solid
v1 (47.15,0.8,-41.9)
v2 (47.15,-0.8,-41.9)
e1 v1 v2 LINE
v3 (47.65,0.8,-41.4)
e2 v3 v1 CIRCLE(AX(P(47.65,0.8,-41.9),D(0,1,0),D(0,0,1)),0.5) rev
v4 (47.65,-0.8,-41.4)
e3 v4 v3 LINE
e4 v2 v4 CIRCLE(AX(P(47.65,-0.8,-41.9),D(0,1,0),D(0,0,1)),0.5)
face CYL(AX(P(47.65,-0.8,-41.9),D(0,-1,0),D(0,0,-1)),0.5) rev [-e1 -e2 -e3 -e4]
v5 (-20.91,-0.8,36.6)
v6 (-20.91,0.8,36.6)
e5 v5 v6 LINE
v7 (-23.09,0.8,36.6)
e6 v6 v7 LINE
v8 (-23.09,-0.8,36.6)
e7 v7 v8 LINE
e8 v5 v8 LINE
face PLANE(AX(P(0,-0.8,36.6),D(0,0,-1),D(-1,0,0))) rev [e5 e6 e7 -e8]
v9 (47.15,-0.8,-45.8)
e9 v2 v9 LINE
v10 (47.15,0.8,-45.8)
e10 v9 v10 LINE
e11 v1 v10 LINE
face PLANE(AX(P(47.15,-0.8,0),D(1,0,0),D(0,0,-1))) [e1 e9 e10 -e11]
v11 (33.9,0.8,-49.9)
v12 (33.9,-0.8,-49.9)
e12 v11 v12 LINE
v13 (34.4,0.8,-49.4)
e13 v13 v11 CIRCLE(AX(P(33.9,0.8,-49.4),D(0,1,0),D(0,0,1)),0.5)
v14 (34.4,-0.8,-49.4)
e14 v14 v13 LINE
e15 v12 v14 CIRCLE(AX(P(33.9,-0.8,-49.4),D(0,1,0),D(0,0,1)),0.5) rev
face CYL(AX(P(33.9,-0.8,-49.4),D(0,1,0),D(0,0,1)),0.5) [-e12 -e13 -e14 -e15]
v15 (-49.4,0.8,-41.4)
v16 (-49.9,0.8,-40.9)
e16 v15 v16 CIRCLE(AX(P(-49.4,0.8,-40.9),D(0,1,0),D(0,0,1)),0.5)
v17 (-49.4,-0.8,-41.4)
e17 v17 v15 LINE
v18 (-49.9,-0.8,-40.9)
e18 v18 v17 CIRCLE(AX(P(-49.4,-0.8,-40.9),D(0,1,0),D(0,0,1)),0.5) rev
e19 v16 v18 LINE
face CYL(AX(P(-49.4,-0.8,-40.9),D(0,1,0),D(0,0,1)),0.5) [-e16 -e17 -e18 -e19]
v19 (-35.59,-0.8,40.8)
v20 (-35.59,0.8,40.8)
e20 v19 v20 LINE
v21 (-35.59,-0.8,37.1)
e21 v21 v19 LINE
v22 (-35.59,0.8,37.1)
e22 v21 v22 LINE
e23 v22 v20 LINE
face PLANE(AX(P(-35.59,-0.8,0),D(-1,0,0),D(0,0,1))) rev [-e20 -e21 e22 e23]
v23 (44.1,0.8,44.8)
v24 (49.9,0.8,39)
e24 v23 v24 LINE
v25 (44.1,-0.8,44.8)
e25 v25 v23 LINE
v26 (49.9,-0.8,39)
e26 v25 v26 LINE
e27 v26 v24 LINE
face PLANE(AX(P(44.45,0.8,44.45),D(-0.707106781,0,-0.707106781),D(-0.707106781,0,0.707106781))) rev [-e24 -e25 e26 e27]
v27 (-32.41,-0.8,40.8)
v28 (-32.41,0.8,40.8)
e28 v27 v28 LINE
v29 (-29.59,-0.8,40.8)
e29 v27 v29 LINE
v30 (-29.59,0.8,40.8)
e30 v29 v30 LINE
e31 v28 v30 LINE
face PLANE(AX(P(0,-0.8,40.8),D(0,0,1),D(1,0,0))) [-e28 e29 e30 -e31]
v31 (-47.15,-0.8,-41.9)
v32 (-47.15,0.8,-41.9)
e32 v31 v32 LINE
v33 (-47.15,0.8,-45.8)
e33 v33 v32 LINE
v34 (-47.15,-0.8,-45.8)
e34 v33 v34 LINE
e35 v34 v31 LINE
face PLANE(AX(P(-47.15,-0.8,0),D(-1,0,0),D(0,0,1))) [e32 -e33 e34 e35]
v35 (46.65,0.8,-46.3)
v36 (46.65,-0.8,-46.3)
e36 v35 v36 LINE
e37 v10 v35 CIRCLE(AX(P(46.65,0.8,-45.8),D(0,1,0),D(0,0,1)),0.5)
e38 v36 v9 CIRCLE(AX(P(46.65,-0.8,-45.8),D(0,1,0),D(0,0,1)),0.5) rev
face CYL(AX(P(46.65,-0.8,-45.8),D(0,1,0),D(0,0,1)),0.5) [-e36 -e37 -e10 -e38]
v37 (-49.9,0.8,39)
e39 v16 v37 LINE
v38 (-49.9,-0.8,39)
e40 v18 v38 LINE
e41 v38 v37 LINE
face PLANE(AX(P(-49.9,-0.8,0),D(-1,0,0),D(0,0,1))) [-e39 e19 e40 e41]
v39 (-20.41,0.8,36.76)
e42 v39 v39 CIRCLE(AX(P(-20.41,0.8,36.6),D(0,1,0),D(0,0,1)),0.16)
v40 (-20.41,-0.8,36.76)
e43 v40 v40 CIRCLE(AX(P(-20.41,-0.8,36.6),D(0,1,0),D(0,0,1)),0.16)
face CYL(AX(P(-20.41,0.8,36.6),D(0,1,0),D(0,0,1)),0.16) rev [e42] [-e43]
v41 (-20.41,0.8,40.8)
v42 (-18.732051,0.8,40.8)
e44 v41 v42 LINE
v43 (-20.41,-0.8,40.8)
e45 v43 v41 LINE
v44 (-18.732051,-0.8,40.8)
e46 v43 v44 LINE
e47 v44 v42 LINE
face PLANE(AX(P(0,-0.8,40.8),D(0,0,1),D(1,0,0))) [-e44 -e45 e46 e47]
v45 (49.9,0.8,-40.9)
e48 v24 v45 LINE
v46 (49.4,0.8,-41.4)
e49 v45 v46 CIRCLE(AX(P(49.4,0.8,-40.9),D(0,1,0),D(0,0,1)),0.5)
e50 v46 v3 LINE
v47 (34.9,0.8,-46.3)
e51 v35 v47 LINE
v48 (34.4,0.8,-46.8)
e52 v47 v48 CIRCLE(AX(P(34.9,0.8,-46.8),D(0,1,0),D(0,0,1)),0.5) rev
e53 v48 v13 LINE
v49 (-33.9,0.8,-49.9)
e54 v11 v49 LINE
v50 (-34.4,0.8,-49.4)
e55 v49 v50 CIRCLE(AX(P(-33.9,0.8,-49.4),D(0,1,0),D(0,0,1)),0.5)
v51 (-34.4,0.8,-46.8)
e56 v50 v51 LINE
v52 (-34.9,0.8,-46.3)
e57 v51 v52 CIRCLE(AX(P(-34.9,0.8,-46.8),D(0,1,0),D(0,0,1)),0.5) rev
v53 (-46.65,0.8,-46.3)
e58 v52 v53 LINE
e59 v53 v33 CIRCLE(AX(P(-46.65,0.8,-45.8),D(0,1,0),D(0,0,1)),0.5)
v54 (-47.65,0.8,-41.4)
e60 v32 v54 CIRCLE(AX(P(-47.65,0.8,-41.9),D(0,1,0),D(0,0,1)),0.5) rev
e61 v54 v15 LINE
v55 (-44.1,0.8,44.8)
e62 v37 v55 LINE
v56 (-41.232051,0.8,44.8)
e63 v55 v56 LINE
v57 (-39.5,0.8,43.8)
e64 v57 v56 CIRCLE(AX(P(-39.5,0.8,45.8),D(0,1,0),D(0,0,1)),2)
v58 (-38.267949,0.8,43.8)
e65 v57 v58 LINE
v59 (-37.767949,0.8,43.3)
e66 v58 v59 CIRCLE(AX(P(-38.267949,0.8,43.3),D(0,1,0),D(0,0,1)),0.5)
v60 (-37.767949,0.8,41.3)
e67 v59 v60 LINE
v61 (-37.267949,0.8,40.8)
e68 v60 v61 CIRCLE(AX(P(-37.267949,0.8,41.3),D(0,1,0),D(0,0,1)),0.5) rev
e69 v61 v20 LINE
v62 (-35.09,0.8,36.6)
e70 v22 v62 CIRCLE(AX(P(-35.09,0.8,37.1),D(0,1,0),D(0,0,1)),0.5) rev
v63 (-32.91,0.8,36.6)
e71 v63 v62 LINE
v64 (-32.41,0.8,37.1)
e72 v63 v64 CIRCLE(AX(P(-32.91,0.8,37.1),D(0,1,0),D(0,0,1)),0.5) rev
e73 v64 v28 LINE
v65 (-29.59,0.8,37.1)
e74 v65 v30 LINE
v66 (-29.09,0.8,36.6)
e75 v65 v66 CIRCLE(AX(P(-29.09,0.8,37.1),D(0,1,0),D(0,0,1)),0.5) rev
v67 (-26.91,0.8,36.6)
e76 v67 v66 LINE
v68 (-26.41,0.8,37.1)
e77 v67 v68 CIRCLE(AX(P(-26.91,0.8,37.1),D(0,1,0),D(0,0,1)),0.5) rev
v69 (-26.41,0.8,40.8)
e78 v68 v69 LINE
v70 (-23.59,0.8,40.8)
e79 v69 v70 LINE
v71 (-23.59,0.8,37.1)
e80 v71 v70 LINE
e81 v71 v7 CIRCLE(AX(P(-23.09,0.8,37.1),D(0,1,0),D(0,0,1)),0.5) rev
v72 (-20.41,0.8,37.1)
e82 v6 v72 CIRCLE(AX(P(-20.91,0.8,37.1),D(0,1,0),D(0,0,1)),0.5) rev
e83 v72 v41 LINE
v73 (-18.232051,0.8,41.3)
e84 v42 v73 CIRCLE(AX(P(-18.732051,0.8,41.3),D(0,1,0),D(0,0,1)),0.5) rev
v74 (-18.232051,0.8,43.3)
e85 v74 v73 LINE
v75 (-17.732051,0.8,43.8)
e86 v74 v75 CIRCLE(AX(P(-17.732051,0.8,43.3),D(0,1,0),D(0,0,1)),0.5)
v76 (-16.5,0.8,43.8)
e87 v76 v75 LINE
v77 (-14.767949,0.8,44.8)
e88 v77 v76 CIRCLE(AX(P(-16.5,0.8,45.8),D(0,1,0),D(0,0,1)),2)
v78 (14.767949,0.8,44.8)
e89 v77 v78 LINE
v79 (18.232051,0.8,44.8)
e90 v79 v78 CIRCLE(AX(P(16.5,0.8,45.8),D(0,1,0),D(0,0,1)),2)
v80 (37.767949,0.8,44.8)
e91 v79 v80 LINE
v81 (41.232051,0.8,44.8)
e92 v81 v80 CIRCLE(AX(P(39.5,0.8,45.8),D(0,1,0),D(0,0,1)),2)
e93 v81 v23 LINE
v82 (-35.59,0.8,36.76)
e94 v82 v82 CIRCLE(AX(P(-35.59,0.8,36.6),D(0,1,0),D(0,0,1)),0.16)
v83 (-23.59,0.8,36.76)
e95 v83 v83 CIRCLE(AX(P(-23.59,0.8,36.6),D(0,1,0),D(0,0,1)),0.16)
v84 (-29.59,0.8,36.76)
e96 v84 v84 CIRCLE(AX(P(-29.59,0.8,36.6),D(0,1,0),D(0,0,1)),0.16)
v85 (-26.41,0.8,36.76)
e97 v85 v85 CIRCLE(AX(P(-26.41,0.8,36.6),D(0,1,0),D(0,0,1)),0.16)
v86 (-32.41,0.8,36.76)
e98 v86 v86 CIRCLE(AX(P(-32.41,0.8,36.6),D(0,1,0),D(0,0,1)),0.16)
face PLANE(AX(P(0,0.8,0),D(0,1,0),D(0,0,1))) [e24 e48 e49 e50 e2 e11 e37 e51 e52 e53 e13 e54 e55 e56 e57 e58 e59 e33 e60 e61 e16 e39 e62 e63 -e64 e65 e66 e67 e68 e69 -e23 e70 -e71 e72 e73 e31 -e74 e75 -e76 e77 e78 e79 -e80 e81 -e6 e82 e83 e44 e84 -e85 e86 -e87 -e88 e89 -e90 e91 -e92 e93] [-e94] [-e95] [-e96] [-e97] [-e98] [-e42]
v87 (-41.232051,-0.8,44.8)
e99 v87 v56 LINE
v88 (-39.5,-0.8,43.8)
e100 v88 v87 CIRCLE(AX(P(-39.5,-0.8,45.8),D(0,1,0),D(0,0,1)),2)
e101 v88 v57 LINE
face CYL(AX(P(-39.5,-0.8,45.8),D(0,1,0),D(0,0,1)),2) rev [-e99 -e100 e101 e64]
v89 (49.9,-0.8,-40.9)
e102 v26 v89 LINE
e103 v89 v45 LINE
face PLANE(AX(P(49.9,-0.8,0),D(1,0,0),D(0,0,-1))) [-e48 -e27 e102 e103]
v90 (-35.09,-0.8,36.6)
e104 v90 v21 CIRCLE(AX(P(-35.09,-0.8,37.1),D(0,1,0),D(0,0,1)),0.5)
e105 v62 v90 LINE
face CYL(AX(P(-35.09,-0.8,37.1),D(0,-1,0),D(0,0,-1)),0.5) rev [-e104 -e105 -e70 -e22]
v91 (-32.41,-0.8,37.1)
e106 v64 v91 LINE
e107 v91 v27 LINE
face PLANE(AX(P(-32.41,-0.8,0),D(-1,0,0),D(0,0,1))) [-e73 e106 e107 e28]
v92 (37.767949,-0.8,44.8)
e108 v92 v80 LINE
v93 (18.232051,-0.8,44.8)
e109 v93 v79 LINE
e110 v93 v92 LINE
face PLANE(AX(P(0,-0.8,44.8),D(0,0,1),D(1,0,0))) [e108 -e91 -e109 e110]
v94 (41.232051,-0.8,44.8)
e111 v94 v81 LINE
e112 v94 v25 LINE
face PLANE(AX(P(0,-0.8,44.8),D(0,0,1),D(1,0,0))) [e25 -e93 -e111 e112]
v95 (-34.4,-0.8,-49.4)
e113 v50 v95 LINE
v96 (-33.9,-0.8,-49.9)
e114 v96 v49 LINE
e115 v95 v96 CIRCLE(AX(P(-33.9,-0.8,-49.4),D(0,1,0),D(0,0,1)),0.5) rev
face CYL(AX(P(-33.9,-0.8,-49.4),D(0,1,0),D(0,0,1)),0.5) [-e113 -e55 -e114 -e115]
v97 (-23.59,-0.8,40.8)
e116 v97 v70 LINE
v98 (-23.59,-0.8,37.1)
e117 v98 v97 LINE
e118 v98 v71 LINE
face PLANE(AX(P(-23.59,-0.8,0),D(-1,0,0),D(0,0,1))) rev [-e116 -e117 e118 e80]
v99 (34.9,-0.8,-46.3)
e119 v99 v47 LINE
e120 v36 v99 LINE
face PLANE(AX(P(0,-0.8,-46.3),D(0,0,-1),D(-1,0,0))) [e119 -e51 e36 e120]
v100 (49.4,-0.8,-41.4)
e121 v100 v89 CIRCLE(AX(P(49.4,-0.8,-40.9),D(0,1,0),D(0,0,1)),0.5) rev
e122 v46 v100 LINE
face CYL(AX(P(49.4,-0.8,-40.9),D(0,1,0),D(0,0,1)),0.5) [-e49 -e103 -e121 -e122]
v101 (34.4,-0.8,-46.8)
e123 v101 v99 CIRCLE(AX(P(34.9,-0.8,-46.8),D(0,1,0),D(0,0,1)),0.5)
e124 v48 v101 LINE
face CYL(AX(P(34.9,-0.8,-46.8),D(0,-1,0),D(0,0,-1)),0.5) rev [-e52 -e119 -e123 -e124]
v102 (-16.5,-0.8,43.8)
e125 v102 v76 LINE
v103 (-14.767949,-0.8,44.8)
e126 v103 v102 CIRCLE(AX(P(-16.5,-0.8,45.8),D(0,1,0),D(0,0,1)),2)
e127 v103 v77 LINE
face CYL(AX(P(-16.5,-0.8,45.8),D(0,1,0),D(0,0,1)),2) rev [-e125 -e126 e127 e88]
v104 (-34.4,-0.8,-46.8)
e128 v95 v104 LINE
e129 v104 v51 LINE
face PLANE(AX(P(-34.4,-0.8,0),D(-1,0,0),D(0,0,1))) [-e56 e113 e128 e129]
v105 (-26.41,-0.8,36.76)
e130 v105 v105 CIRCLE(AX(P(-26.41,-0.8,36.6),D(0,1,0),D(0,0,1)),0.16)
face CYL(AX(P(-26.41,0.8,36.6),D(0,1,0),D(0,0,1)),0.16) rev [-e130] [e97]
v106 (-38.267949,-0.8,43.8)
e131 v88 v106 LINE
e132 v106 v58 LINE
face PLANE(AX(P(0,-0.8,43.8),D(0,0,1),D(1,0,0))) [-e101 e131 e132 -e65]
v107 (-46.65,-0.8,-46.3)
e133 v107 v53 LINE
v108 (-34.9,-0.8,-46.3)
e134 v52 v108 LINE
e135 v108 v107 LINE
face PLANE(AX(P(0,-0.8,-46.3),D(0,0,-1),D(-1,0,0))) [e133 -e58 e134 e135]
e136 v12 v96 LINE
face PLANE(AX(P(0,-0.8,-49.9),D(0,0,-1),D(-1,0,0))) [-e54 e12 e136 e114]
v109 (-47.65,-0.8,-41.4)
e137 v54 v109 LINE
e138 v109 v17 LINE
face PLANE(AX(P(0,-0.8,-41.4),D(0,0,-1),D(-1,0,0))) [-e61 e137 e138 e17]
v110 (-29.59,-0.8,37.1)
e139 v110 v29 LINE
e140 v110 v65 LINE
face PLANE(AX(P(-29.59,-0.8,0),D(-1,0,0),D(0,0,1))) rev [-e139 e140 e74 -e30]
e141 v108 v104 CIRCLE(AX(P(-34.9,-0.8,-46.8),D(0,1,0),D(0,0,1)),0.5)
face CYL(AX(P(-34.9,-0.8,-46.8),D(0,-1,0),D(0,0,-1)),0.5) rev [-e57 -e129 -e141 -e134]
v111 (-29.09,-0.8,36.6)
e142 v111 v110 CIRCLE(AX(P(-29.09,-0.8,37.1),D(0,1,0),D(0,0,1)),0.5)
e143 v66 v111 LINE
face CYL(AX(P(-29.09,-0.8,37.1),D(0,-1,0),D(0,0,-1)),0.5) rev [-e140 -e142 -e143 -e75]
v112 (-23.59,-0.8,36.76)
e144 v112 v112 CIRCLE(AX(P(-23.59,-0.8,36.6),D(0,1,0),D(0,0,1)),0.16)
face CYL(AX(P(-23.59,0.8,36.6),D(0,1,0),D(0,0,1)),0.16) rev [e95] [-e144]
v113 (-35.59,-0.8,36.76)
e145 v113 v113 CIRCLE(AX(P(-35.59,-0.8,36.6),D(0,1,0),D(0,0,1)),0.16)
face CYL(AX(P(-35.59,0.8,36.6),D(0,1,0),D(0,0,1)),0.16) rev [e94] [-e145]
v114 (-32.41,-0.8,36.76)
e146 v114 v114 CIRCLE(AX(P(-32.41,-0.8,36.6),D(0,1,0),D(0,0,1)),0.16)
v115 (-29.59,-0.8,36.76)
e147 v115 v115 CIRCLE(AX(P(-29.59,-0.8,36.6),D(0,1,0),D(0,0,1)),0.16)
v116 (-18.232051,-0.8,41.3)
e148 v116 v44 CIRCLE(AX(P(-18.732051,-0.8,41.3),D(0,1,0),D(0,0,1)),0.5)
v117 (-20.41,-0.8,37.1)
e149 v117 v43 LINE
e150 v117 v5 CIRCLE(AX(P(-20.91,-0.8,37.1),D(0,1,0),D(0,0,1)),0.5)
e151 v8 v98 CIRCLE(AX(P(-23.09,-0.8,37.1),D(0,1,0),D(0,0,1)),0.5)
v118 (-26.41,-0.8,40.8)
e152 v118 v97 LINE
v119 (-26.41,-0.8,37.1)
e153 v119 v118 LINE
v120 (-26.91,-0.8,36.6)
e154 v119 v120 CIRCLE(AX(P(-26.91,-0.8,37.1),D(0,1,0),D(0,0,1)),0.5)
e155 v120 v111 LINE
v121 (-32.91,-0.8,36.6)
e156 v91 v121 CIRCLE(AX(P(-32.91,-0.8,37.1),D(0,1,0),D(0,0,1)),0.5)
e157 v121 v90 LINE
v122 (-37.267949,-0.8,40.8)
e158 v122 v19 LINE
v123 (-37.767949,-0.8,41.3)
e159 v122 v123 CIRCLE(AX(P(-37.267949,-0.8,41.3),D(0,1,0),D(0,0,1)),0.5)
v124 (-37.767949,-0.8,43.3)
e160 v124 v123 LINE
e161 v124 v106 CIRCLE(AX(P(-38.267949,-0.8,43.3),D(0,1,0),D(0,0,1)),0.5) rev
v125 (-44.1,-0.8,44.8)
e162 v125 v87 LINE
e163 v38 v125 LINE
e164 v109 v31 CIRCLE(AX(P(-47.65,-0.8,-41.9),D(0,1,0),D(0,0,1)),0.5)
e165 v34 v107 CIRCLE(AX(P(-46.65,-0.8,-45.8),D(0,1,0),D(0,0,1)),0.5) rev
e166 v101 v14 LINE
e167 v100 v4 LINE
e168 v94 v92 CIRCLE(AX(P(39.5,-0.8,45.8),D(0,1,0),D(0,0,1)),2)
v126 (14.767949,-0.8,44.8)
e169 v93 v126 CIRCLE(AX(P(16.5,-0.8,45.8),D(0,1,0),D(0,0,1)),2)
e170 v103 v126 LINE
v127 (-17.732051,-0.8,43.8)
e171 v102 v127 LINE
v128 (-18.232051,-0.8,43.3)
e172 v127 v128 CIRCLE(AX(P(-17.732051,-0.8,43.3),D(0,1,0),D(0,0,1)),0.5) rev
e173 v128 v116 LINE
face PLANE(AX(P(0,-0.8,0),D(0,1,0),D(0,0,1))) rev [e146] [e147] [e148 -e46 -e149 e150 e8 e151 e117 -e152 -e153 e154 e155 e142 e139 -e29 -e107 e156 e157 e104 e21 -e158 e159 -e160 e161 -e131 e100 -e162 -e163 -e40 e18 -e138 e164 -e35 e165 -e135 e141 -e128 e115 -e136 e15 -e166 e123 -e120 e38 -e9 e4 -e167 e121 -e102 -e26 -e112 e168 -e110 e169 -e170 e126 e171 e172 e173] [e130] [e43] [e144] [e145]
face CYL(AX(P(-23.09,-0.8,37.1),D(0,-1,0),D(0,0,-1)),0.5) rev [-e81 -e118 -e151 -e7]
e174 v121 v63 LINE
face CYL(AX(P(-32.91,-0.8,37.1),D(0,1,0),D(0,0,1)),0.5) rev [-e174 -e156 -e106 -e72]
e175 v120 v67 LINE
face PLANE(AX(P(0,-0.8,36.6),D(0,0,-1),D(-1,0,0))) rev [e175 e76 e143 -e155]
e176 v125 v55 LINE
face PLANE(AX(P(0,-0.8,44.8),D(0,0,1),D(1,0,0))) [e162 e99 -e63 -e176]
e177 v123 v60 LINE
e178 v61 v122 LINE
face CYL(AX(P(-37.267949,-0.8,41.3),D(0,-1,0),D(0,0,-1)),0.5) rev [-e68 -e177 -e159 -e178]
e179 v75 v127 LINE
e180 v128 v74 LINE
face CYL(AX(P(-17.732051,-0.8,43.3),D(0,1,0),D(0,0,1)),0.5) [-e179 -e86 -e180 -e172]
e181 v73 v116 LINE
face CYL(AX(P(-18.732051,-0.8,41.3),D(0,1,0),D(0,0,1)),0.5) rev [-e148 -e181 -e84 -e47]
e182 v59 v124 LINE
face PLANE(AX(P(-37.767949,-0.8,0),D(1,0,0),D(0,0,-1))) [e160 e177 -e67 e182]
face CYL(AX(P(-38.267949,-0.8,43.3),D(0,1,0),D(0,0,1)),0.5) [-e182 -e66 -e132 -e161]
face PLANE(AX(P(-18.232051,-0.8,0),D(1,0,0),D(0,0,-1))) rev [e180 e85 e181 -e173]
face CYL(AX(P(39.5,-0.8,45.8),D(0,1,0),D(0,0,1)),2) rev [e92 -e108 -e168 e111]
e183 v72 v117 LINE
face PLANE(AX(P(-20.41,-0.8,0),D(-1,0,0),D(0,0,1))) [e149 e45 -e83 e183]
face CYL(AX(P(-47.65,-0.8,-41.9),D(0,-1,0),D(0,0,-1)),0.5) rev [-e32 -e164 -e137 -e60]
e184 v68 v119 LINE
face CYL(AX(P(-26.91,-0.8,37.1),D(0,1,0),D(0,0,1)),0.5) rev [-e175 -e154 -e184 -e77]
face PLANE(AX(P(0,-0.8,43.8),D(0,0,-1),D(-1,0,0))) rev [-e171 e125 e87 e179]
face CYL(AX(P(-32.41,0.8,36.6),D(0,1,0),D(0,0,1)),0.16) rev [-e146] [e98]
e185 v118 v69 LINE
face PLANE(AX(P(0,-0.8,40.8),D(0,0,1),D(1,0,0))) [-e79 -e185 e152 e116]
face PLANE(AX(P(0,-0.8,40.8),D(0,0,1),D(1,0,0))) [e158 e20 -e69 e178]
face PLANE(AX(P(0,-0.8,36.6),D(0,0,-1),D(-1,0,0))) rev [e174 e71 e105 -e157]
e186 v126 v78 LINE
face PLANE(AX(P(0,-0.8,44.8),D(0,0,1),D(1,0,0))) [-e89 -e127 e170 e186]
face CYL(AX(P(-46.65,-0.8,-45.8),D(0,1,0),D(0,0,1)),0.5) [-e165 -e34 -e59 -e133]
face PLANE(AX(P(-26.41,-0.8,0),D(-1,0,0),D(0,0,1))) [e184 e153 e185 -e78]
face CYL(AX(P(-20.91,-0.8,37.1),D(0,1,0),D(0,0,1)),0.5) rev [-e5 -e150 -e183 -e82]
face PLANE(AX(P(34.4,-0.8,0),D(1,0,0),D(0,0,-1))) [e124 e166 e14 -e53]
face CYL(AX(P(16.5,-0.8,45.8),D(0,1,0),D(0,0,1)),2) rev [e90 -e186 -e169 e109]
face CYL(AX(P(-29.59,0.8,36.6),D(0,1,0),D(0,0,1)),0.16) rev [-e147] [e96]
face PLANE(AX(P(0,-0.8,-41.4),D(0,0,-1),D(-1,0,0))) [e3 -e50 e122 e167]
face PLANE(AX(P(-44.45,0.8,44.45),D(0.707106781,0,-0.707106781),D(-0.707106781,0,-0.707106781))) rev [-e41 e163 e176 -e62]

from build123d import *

# Parameters (mm, degrees)
GENERALSHAPE_DEPTH           = 0.8
ADDTOLERANCE_START           = -0.8
ADDTOLERANCE_DEPTH           = 1.6
BACKPLANE_DEPTH              = 71.573791169
BACKPLANE_DEPTH_BACK         = 71.573791169
RF_W                         = 3.18
RF_H                         = 4.2
CUT_EXTRUDE1_DEPTH           = 71.587392642
FILLET1_R                    = 0.5
F_0_32_0_32_DIAMETER_HOLE1_D = 0.32
FILLET2_R                    = 0.5
FILLET3_R                    = 0.5


# Read off the part's stored shape, not the designer's step: AddTolerance
with BuildPart() as part:
    # Sketch2 → GeneralShape (new, symmetric)
    with BuildSketch(Plane(origin=(0, 0, 0), x_dir=(1, 0, 0), z_dir=(0, 1, 0))):
        Polygon((47.25, 46.4), (34.5, 46.4), (34.5, 50), (-34.5, 50), (-34.5, 46.4), (-47.25, 46.4), (-47.25, 41.5), (-50, 41.5), (-50, -38.9), (-41.5, -47.4), (41.5, -47.4), (50, -38.9), (50, 41.5), (47.25, 41.5), align=None)
    extrude(amount=GENERALSHAPE_DEPTH, both=True)

    # AddTolerance outline → AddTolerance (cut)
    with BuildSketch(Plane(origin=(0, 0, 0), x_dir=(1, 0, 0), z_dir=(0, 1, 0)).offset(ADDTOLERANCE_START)):
        Polygon((49.9, 41.4), (49.9, -39), (50, -38.9), (50, 41.5), (47.25, 41.5), (47.25, 46.4), (34.5, 46.4), (34.5, 50), (-34.5, 50), (-34.5, 46.4), (-47.25, 46.4), (-47.25, 41.5), (-50, 41.5), (-50, -38.9), (-49.9, -39), (-49.9, 41.4), (-47.15, 41.4), (-47.15, 46.3), (-34.4, 46.3), (-34.4, 49.9), (34.4, 49.9), (34.4, 46.3), (47.15, 46.3), (47.15, 41.4), align=None)
    extrude(amount=ADDTOLERANCE_DEPTH, mode=Mode.SUBTRACT)

    # Sketch4 → Backplane (cut, two sides: drawn at the far end of the back side and taken through both)
    with BuildSketch(Plane(origin=(0, 0, 0), x_dir=(1, 0, 0), z_dir=(0, 1, 0)).offset(-BACKPLANE_DEPTH_BACK)):
        with BuildLine():
            Line((41.5, -47.4), (44.1, -44.8))
            Line((44.1, -44.8), (41.232050808, -44.8))
            ThreePointArc((41.232050808, -44.8), (39.5, -43.8), (37.767949192, -44.8))
            Line((37.767949192, -44.8), (18.232050808, -44.8))
            ThreePointArc((18.232050808, -44.8), (16.5, -43.8), (14.767949192, -44.8))
            Line((14.767949192, -44.8), (-14.767949192, -44.8))
            ThreePointArc((-14.767949192, -44.8), (-16.5, -43.8), (-18.232050808, -44.8))
            Line((-18.232050808, -44.8), (-37.767949192, -44.8))
            ThreePointArc((-37.767949192, -44.8), (-39.5, -43.8), (-41.232050808, -44.8))
            Line((-41.232050808, -44.8), (-44.1, -44.8))
            Line((-44.1, -44.8), (-41.5, -47.4))
            Line((-41.5, -47.4), (41.5, -47.4))
        make_face()
    extrude(amount=BACKPLANE_DEPTH + BACKPLANE_DEPTH_BACK, mode=Mode.SUBTRACT)

    # RF → Cut-Extrude1 (cut, through all)
    with BuildSketch(Plane(origin=(0, 0.8, 0), x_dir=(1, 0, 0), z_dir=(0, 1, 0))):
        with Locations((-22, -38.7)):
            Rectangle(RF_W, RF_H)
        with Locations((-28, -38.7)):
            Rectangle(RF_W, RF_H)
        with Locations((-34, -38.7)):
            Rectangle(RF_W, RF_H)
        with BuildLine():
            Line((-18.232050808, -40.8), (-20.41, -40.8))
            Line((-20.41, -40.8), (-23.59, -40.8))
            Line((-23.59, -40.8), (-26.41, -40.8))
            Line((-26.41, -40.8), (-29.59, -40.8))
            Line((-29.59, -40.8), (-32.41, -40.8))
            Line((-32.41, -40.8), (-35.59, -40.8))
            Line((-35.59, -40.8), (-37.767949192, -40.8))
            Line((-37.767949192, -40.8), (-37.767949192, -43.8))
            Line((-37.767949192, -43.8), (-39.5, -43.8))
            ThreePointArc((-39.5, -43.8), (-38.5, -44.067949192), (-37.767949192, -44.8))
            Line((-37.767949192, -44.8), (-18.232050808, -44.8))
            ThreePointArc((-18.232050808, -44.8), (-17.5, -44.067949192), (-16.5, -43.8))
            Line((-16.5, -43.8), (-18.232050808, -43.8))
            Line((-18.232050808, -43.8), (-18.232050808, -40.8))
        make_face()
    extrude(amount=-CUT_EXTRUDE1_DEPTH, mode=Mode.SUBTRACT)

    # Fillet1
    fillet1_edges = [part.edges().sort_by_distance(p)[0] for p in [
        (-23.59, 0, 36.6),
        (-20.41, 0, 36.6),
        (-18.232050808, 0, 40.8),
        (-18.232050808, 0, 43.8),
        (-37.767949192, 0, 43.8),
        (-37.767949192, 0, 40.8),
        (-35.59, 0, 36.6),
        (-32.41, 0, 36.6),
        (-29.59, 0, 36.6),
        (-26.41, 0, 36.6),
    ]]
    fillet(fillet1_edges, radius=FILLET1_R)

    # Ø0.32 (0.32) Diameter Hole1 (through all)
    with Locations(Plane(origin=(0, 0.8, 0), x_dir=(1, 0, 0), z_dir=(0, 1, 0))):
        with Locations((-20.41, -36.6), (-23.59, -36.6), (-26.41, -36.6), (-29.59, -36.6), (-32.41, -36.6), (-35.59, -36.6)):
            Hole(F_0_32_0_32_DIAMETER_HOLE1_D / 2)

    # Fillet2
    fillet2_edges = [part.edges().sort_by_distance(p)[0] for p in [
        (47.15, 0, -41.4),
        (47.15, 0, -46.3),
        (34.4, 0, -46.3),
        (-34.4, 0, -46.3),
        (-47.15, 0, -46.3),
        (-47.15, 0, -41.4),
    ]]
    fillet(fillet2_edges, radius=FILLET2_R)

    # Fillet3
    fillet3_edges = [part.edges().sort_by_distance(p)[0] for p in [
        (49.9, 0, -41.4),
        (34.4, 0, -49.9),
        (-34.4, 0, -49.9),
        (-49.9, 0, -41.4),
    ]]
    fillet(fillet3_edges, radius=FILLET3_R)


solid = part.part
